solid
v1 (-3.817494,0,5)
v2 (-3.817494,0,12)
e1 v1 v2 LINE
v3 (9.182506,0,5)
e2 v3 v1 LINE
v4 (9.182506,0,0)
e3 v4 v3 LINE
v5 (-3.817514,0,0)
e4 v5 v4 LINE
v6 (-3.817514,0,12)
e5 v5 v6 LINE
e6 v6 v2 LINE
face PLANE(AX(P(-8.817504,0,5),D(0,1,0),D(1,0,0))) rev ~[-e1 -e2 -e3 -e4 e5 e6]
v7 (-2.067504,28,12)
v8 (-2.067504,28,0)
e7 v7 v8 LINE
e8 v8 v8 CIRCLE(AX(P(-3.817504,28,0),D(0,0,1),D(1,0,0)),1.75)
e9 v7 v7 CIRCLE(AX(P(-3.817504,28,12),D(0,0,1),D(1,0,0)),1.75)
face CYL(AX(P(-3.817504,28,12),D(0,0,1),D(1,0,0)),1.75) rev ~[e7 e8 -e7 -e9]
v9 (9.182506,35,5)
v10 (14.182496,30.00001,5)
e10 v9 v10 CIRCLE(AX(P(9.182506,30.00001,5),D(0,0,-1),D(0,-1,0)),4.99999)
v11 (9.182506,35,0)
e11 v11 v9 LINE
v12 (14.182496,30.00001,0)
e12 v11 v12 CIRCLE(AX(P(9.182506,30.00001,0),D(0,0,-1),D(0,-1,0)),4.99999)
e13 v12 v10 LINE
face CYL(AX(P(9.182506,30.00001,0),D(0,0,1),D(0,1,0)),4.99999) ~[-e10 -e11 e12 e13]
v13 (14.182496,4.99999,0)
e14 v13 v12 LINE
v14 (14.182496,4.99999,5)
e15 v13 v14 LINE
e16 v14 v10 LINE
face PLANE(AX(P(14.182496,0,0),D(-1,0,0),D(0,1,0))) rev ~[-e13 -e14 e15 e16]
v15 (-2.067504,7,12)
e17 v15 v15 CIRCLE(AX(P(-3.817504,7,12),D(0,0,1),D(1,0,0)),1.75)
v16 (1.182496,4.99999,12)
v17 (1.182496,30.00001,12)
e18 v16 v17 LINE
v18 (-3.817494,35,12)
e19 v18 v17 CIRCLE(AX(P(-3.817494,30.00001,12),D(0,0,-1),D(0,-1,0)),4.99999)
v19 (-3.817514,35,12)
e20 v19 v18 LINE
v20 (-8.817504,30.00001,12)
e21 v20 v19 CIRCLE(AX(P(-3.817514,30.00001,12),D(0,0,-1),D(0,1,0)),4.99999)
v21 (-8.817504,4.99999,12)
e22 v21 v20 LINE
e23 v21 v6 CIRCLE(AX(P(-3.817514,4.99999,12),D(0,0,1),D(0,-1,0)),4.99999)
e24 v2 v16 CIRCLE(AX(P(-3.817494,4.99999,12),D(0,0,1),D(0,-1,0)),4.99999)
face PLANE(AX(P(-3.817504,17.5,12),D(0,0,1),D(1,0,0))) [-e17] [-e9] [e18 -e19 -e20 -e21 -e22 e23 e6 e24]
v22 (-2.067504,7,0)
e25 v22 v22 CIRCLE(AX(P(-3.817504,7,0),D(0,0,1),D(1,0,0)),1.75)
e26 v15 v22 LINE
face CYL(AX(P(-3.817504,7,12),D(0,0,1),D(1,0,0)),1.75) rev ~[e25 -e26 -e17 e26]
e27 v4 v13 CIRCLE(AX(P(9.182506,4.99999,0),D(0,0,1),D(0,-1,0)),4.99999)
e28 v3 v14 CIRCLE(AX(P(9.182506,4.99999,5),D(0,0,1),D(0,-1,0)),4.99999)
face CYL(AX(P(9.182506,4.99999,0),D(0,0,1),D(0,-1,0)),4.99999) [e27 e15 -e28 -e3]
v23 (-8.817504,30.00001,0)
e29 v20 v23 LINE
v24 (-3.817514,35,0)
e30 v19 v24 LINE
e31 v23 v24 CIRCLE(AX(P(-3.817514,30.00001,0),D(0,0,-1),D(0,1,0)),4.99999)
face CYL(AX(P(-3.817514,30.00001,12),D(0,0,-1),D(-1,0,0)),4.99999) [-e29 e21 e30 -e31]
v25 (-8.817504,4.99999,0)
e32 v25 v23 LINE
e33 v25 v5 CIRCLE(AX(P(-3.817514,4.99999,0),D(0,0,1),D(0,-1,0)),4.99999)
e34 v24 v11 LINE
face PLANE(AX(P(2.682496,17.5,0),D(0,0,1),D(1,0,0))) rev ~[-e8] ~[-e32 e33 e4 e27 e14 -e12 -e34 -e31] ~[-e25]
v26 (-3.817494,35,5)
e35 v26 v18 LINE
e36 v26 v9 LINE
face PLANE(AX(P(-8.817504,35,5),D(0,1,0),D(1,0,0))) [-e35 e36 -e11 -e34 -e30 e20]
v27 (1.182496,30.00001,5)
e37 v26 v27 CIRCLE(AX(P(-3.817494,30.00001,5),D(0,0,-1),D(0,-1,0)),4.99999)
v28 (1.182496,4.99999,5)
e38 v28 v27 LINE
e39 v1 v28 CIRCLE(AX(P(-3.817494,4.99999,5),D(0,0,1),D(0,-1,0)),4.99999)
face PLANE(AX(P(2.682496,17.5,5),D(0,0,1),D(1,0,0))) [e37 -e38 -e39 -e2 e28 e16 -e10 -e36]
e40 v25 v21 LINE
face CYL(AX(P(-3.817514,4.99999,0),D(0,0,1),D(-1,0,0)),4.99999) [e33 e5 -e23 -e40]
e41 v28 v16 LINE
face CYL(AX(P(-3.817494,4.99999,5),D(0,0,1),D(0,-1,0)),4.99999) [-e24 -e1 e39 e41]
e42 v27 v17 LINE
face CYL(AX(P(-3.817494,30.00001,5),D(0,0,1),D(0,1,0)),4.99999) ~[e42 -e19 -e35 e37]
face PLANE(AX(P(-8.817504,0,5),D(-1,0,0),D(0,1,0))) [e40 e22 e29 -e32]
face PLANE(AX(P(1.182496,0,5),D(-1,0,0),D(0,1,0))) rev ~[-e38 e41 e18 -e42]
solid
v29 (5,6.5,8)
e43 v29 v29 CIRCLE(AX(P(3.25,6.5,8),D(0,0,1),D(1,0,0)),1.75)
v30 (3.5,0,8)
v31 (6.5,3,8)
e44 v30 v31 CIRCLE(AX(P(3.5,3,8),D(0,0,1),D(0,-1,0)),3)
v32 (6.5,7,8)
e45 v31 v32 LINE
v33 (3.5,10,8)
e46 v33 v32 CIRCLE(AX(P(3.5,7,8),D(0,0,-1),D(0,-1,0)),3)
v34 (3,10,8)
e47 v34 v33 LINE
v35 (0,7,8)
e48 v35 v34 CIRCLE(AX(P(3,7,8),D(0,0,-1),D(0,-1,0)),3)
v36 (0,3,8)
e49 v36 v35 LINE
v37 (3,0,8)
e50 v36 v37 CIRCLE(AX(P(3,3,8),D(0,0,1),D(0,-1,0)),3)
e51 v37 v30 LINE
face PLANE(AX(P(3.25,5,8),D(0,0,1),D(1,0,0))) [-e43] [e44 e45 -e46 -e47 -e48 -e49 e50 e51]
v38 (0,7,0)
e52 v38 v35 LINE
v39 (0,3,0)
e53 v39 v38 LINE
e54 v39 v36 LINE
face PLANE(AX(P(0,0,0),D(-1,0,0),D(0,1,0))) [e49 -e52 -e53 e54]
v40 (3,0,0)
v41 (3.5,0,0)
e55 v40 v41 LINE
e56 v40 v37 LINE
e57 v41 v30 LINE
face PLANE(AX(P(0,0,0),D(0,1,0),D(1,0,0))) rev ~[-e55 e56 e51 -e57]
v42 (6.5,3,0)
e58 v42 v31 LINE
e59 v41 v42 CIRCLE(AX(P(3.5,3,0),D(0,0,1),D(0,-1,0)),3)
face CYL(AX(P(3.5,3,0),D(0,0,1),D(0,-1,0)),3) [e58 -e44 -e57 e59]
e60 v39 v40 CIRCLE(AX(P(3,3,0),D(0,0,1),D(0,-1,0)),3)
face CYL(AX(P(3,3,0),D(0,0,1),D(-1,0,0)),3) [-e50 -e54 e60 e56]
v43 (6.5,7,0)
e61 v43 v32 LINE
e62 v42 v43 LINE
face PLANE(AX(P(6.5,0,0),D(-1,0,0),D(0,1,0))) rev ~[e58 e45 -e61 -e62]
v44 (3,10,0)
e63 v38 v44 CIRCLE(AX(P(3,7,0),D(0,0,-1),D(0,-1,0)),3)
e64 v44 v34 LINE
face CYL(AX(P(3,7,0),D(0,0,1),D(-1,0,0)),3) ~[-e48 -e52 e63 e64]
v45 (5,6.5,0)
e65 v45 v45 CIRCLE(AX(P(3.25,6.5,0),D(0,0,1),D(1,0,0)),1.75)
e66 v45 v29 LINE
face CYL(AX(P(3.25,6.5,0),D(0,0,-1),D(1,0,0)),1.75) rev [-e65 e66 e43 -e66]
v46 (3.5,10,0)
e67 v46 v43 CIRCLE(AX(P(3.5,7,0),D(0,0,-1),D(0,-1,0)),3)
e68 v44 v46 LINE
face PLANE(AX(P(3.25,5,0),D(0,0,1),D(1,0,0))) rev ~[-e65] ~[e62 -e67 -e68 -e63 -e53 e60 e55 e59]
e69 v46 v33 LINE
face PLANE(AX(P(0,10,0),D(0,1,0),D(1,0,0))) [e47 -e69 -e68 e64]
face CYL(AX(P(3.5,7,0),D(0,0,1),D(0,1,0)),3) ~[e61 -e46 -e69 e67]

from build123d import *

# Parameters (mm, degrees)
F0_W     = 23
F0_H     = 35
F1_DEPTH = 5
F2_W     = 10
F2_H     = 35
F3_DEPTH = 7
F4_R     = 1.75
F5_DEPTH = 12
F6_R     = 4.99999
F7_W     = 6.5
F7_H     = 10
F7_R     = 1.75
F8_DEPTH = 8
F9_R     = 3


# Not quite as in the source:
# - a fillet or chamfer is up to 0.001 mm smaller than in the source, because OpenCascade refuses the exact size


with BuildPart() as f1:
    # F0 (on Top) → F1 (new body)
    with BuildSketch(Plane.XY):
        with Locations((2.6824958399, 17.5)):
            Rectangle(F0_W, F0_H)
    extrude(amount=F1_DEPTH)

    # F2 (on face) → F3 (join)
    with BuildSketch(Plane.XY.offset(5)):
        with Locations((-3.8175041601, 17.5)):
            Rectangle(F2_W, F2_H)
    extrude(amount=F3_DEPTH)

    # F4 (on face) → F5 (cut, through all)
    with BuildSketch(Plane.XY.offset(12)):
        with Locations((-3.8175041601, 28)):
            Circle(F4_R)
        with Locations((-3.8175041601, 7)):
            Circle(F4_R)
    extrude(amount=-F5_DEPTH, mode=Mode.SUBTRACT)

    # F6 (radius 5 in the source; OpenCascade refuses exactly that, so slightly less here)
    f6_edges = [f1.edges().sort_by_distance(p)[0] for p in [
        (-8.817504, 35, 6),
        (1.182496, 35, 8.5),
        (-8.817504, 0, 6),
        (1.182496, 0, 8.5),
        (14.182496, 0, 2.5),
        (14.182496, 35, 2.5),
    ]]
    fillet(f6_edges, radius=F6_R)


with BuildPart() as f8:
    # F7 (on Top) → F8 (new body)
    with BuildSketch(Plane.XY):
        with Locations((3.25, 5)):
            Rectangle(F7_W, F7_H)
        with Locations((3.25, 6.5)):
            Circle(F7_R, mode=Mode.SUBTRACT)
    extrude(amount=F8_DEPTH)

    # F9
    f9_edges = [f8.edges().sort_by_distance(p)[0] for p in [
        (6.5, 0, 4),
        (6.5, 10, 4),
        (0, 0, 4),
        (0, 10, 4),
    ]]
    fillet(f9_edges, radius=F9_R)


solid = Compound([f1.part, f8.part])
